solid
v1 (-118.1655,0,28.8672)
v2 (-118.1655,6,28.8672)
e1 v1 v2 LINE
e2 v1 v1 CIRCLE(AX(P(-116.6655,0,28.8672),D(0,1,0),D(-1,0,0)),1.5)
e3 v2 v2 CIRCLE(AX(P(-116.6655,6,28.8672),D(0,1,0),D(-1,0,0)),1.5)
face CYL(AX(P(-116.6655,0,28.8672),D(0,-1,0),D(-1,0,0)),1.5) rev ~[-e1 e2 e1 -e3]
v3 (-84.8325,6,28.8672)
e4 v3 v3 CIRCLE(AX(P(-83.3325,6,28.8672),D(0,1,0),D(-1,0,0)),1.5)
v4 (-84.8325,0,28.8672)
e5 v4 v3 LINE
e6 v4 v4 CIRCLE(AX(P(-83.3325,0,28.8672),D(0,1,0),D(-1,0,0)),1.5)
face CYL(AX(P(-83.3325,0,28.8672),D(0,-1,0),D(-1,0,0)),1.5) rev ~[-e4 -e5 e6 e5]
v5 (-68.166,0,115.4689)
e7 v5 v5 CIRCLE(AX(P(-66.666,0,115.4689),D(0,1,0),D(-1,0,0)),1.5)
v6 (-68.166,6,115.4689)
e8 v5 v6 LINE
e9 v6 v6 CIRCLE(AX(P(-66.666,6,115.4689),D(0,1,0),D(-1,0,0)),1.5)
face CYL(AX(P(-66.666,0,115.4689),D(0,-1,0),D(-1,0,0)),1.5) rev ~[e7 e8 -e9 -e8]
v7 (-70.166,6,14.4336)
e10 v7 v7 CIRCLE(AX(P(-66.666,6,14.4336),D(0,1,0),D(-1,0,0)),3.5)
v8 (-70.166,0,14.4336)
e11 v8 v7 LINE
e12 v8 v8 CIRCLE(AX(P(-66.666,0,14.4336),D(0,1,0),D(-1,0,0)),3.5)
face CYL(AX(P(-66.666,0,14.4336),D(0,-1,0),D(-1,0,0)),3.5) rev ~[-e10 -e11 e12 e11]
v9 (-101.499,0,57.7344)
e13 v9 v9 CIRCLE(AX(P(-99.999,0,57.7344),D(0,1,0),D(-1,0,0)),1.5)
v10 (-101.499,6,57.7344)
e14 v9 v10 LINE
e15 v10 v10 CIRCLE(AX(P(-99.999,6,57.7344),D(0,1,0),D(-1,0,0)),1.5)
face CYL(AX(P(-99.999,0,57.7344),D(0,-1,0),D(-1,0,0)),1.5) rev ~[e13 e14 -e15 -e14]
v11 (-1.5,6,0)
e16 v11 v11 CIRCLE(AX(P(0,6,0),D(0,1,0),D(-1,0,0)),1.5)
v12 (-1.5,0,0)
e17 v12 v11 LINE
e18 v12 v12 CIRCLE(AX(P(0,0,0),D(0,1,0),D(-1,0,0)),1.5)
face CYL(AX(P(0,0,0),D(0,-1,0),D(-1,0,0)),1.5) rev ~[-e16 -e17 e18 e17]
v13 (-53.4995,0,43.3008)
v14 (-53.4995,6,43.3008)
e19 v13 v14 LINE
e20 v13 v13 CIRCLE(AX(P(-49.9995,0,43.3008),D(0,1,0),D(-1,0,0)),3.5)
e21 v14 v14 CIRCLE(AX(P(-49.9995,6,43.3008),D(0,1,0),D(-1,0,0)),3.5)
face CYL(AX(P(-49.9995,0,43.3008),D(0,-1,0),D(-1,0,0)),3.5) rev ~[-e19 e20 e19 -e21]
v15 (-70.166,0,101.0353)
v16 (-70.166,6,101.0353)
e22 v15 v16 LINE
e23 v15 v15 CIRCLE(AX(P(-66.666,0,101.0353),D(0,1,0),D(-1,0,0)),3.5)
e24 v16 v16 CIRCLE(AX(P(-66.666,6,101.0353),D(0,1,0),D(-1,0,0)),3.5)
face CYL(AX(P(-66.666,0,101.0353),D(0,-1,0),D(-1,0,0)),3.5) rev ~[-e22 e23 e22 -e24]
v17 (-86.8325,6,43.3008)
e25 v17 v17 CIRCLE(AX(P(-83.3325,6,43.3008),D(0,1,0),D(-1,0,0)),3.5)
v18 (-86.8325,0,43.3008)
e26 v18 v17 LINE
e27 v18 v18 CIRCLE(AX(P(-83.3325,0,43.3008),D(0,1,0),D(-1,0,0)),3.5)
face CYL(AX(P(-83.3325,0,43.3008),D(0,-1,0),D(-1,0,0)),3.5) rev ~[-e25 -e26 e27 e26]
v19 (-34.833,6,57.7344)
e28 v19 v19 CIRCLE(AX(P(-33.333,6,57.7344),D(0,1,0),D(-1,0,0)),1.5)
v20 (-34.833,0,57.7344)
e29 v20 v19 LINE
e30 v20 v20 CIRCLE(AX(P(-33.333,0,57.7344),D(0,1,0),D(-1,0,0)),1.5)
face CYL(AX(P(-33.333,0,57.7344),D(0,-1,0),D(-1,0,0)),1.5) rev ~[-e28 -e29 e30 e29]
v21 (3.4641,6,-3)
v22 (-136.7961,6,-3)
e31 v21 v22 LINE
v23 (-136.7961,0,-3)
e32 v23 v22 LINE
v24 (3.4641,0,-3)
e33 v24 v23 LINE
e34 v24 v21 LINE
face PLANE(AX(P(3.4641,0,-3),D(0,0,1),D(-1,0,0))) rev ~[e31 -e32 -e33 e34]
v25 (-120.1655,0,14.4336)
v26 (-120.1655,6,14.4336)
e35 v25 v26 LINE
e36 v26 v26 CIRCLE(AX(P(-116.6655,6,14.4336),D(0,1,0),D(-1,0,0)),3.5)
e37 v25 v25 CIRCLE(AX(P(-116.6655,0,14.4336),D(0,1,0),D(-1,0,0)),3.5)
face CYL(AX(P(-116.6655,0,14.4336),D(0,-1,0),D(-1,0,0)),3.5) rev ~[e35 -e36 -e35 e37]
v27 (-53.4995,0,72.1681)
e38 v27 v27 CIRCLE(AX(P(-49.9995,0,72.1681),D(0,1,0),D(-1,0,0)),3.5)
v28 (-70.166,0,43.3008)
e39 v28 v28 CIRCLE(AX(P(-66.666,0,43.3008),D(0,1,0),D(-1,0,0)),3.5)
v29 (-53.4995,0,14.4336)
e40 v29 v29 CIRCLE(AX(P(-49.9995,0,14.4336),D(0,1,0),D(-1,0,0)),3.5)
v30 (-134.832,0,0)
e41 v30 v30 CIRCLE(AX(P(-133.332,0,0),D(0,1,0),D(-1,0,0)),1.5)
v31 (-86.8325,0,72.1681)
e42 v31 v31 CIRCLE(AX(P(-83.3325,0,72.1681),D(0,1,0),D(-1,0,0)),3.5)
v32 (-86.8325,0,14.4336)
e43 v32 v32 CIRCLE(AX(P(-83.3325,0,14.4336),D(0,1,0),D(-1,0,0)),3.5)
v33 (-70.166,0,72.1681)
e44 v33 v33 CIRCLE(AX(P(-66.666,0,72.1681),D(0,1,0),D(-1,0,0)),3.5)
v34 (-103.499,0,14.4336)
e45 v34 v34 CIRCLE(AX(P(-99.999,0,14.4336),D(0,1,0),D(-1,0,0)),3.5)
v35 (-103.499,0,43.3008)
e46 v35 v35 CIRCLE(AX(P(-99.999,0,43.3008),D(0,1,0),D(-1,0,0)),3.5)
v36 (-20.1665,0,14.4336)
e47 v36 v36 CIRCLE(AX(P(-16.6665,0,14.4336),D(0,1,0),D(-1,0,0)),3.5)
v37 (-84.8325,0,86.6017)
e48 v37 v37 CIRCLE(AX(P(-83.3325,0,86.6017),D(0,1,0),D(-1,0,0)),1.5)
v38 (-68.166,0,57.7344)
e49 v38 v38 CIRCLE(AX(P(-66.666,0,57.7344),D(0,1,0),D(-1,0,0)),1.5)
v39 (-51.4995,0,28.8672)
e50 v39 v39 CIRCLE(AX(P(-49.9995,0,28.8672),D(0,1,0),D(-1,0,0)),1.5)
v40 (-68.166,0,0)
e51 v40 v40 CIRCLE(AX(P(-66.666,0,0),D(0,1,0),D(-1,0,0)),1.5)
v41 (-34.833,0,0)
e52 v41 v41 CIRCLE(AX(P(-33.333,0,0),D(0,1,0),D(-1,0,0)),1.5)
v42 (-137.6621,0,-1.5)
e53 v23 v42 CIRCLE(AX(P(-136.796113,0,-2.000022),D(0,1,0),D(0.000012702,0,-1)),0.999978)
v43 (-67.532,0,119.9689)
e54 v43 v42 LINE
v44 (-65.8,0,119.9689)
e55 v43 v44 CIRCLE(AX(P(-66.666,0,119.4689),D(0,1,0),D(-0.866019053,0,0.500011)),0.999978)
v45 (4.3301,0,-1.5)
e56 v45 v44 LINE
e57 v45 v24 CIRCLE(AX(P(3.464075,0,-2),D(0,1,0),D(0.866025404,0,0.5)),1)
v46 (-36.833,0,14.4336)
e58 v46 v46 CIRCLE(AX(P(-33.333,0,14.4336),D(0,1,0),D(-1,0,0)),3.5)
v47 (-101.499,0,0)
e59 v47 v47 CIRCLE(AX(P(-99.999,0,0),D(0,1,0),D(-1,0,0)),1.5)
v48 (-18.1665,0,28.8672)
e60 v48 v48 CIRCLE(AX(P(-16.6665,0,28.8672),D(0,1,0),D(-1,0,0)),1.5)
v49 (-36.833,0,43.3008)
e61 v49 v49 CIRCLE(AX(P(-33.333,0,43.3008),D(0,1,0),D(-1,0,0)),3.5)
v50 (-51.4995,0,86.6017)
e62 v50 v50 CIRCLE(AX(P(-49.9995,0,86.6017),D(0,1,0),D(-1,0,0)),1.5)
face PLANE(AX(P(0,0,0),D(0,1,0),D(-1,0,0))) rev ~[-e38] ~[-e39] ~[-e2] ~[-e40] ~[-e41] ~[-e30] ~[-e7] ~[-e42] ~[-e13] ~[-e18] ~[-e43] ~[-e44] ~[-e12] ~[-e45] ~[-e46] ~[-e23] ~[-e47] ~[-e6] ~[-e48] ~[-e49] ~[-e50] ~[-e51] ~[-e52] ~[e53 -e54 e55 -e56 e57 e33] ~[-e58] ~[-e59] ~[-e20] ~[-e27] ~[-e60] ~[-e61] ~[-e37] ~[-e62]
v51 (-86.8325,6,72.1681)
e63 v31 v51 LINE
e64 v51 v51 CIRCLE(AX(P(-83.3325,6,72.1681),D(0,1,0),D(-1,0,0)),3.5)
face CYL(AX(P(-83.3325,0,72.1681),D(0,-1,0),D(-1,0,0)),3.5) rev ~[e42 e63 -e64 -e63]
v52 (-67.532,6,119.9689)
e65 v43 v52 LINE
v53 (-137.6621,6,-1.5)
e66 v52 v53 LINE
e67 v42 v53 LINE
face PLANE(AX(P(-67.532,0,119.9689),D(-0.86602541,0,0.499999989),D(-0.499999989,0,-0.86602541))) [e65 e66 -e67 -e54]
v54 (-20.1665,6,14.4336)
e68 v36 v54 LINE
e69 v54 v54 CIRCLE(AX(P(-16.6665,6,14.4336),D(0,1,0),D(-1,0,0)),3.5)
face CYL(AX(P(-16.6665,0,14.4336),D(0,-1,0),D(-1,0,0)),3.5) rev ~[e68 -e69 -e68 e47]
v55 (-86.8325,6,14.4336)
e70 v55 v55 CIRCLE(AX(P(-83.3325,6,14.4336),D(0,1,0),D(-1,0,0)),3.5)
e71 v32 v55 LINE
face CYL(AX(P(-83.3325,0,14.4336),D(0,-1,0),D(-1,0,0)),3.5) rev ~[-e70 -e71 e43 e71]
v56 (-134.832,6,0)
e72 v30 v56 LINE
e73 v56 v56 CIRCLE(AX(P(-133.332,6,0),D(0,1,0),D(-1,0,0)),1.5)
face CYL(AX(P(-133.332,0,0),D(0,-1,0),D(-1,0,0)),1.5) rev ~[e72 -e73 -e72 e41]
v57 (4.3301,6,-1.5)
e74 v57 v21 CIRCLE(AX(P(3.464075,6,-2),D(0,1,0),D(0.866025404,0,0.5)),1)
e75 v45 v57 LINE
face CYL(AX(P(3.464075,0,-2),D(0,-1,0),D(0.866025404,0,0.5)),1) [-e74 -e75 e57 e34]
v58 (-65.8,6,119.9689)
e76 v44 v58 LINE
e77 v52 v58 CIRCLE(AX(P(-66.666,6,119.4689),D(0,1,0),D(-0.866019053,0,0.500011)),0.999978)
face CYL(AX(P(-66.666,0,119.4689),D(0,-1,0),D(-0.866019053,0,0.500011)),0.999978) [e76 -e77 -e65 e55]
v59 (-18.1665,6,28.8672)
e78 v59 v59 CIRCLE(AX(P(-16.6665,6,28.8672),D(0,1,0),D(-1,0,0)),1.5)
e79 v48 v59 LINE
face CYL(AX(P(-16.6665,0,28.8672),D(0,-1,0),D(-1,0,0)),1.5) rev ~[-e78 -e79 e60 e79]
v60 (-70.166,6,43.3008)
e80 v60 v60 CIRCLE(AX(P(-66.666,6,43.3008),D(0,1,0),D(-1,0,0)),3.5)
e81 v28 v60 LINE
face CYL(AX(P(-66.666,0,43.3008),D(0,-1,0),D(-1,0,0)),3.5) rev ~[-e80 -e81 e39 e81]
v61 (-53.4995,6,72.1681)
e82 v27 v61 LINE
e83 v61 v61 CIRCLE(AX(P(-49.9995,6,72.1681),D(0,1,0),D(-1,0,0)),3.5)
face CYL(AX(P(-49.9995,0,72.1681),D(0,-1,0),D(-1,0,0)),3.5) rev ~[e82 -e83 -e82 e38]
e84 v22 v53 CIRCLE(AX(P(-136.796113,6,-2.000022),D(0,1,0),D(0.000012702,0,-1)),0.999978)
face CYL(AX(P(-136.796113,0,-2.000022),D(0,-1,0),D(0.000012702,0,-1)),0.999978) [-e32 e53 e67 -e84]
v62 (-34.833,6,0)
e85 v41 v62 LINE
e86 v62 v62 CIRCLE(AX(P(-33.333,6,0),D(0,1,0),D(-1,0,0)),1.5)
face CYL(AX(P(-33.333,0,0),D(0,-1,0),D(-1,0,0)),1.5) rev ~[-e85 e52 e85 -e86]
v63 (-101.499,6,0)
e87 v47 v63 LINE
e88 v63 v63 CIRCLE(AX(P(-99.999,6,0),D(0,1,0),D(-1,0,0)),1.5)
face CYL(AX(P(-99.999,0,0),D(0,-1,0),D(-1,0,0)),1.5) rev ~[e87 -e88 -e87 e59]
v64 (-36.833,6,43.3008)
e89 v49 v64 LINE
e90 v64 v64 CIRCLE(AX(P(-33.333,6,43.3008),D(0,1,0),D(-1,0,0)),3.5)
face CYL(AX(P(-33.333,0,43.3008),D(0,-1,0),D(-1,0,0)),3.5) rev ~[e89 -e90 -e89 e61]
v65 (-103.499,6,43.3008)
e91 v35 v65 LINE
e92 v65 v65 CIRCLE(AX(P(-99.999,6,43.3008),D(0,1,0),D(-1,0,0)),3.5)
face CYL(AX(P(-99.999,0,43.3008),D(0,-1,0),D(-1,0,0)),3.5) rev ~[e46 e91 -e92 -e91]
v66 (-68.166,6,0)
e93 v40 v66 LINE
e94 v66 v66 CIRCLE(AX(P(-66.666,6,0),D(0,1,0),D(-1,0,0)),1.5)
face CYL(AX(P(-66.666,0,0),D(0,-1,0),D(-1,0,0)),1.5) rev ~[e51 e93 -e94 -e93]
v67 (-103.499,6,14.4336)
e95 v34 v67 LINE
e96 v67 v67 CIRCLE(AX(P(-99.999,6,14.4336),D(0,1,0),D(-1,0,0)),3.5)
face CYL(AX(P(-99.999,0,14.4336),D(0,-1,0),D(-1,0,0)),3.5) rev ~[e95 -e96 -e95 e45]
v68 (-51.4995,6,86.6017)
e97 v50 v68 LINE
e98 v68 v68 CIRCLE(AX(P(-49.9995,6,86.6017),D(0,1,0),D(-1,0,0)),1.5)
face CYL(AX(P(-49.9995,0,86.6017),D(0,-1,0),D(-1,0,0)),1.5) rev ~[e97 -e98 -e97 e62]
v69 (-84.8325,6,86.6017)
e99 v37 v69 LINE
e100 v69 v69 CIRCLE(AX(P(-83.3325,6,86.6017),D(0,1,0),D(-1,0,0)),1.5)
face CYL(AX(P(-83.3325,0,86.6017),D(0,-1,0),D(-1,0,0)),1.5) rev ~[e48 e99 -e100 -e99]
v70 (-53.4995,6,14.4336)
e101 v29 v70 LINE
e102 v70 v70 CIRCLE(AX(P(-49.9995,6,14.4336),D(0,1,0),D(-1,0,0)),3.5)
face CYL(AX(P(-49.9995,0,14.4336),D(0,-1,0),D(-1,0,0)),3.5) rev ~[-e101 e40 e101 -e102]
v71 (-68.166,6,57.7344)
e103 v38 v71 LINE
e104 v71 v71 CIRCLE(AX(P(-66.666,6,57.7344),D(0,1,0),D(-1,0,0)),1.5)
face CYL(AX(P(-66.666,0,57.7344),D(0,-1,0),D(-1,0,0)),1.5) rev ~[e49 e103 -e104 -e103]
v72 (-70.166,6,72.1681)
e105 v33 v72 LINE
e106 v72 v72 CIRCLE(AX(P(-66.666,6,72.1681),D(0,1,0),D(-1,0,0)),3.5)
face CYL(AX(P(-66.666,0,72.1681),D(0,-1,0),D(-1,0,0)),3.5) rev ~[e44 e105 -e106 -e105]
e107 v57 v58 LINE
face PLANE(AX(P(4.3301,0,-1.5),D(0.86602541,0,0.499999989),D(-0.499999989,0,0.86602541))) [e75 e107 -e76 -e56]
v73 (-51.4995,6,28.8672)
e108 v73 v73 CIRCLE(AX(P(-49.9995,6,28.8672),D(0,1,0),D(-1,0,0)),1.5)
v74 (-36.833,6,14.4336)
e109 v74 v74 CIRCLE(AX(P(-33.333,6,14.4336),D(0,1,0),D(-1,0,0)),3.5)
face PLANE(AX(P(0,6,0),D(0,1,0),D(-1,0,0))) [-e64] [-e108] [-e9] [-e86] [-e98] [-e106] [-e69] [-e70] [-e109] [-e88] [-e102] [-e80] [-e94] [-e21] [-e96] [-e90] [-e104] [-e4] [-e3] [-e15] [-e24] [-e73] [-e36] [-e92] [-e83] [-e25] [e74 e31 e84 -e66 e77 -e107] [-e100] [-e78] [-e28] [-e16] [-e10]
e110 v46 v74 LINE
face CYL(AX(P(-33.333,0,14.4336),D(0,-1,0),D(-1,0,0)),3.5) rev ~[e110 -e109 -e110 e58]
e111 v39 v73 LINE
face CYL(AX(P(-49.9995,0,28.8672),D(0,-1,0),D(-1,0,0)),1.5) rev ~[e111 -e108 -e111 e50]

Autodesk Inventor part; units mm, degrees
ref_plane "YZ Plane" through (0, 0, 0) normal (1, 0, 0) x (0, 1, 0)
ref_plane "XZ Plane" through (0, 0, 0) normal (0, 1, 0) x (-1, 0, 0)
ref_plane "XY Plane" through (0, 0, 0) normal (0, 0, 1) x (1, 0, 0)
sketch "Triangle 1mm" plane through (0, 0, 0) normal (0, 0, 1) x (1, 0, 0)
  line L0 (0, 0) -> (16.6665, 28.8672) construction
  line L1 (16.6665, 28.8672) -> (33.333, 0) construction
  line L2 (33.333, 0) -> (0, 0) construction
  line L3 (33.333, 0) -> (8.3332, 14.4336) construction
  line L4 (0, 0) -> (24.9997, 14.4336) construction
  line L5 (16.6665, 28.8672) -> (16.6665, 0) construction
  line L6 (0, 14.4336) -> (33.333, 14.4336) construction
  line L7 (0, 19.4336) -> (33.333, 19.4336) construction
  line L8 (0, 9.4336) -> (33.333, 9.4336) construction
  line L9 (16.6665, 19.4336) -> (16.6665, 14.4336) construction
  line L10 (16.6665, 14.4336) -> (16.6665, 9.4336) construction
  circle A0 centre (16.6665, 14.4336) radius 3.5
  point P0 (16.9666, 9.7956)
  dimension "d14" = 33.333
  dimension "d31" = 10
  dimension "d43" = 7
sketch "Tri16 1mm" plane through (0, 0, 0) normal (0, 0, 1) x (1, 0, 0)
  line L0 (0, 0) -> (16.6665, 28.8672) construction
  line L1 (16.6665, 28.8672) -> (33.333, 0) construction
  line L2 (33.333, 0) -> (0, 0) construction
  line L3 (33.333, 0) -> (8.3333, 14.4336) construction
  line L4 (0, 0) -> (24.9998, 14.4336) construction
  line L5 (16.6665, 28.8672) -> (16.6665, 0) construction
  line L6 (0, 14.4336) -> (33.333, 14.4336) construction
  line L7 (0, 19.4336) -> (33.333, 19.4336) construction
  line L8 (0, 9.4336) -> (33.333, 9.4336) construction
  line L9 (16.6665, 19.4336) -> (16.6665, 14.4336) construction
  line L10 (16.6665, 14.4336) -> (16.6665, 9.4336) construction
  circle A0 centre (16.6665, 14.4336) radius 3.5
  line L11 (33.333, 0) -> (49.9995, 28.8672) construction
  line L12 (49.9995, 28.8672) -> (66.666, 0) construction
  line L13 (66.666, 0) -> (33.333, 0) construction
  line L14 (66.666, 0) -> (41.6663, 14.4336) construction
  line L15 (33.333, 0) -> (58.3328, 14.4336) construction
  line L16 (49.9995, 28.8672) -> (49.9995, 0) construction
  line L17 (33.333, 14.4336) -> (66.666, 14.4336) construction
  line L18 (33.333, 19.4336) -> (66.666, 19.4336) construction
  line L19 (33.333, 9.4336) -> (66.666, 9.4336) construction
  line L20 (49.9995, 19.4336) -> (49.9995, 14.4336) construction
  line L21 (49.9995, 14.4336) -> (49.9995, 9.4336) construction
  circle A1 centre (49.9995, 14.4336) radius 3.5
  line L22 (49.9995, 28.8672) -> (33.333, 0) construction
  line L23 (33.333, 0) -> (16.6665, 28.8672) construction
  line L24 (16.6665, 28.8672) -> (49.9995, 28.8672) construction
  line L25 (16.6665, 28.8672) -> (41.6663, 14.4336) construction
  line L26 (49.9995, 28.8672) -> (24.9998, 14.4336) construction
  line L27 (33.333, 0) -> (33.333, 28.8672) construction
  line L28 (49.9995, 14.4336) -> (16.6665, 14.4336) construction
  line L29 (49.9995, 9.4336) -> (16.6665, 9.4336) construction
  line L30 (49.9995, 19.4336) -> (16.6665, 19.4336) construction
  line L31 (33.333, 9.4336) -> (33.333, 14.4336) construction
  line L32 (33.333, 14.4336) -> (33.333, 19.4336) construction
  circle A2 centre (33.333, 14.4336) radius 3.5
  line L33 (83.3325, 28.8672) -> (66.666, 0) construction
  line L34 (66.666, 0) -> (49.9995, 28.8672) construction
  line L35 (49.9995, 28.8672) -> (83.3325, 28.8672) construction
  line L36 (49.9995, 28.8672) -> (74.9993, 14.4336) construction
  line L37 (83.3325, 28.8672) -> (58.3328, 14.4336) construction
  line L38 (66.666, 0) -> (66.666, 28.8672) construction
  line L39 (83.3325, 14.4336) -> (49.9995, 14.4336) construction
  line L40 (83.3325, 9.4336) -> (49.9995, 9.4336) construction
  line L41 (83.3325, 19.4336) -> (49.9995, 19.4336) construction
  line L42 (66.666, 9.4336) -> (66.666, 14.4336) construction
  line L43 (66.666, 14.4336) -> (66.666, 19.4336) construction
  circle A3 centre (66.666, 14.4336) radius 3.5
  line L44 (66.666, 0) -> (83.3325, 28.8672) construction
  line L45 (83.3325, 28.8672) -> (99.999, 0) construction
  line L46 (99.999, 0) -> (66.666, 0) construction
  line L47 (99.999, 0) -> (74.9993, 14.4336) construction
  line L48 (66.666, 0) -> (91.6658, 14.4336) construction
  line L49 (83.3325, 28.8672) -> (83.3325, 0) construction
  line L50 (66.666, 14.4336) -> (99.999, 14.4336) construction
  line L51 (66.666, 19.4336) -> (99.999, 19.4336) construction
  line L52 (66.666, 9.4336) -> (99.999, 9.4336) construction
  line L53 (83.3325, 19.4336) -> (83.3325, 14.4336) construction
  line L54 (83.3325, 14.4336) -> (83.3325, 9.4336) construction
  circle A4 centre (83.3325, 14.4336) radius 3.5
  line L55 (99.999, 0) -> (116.6655, 28.8672) construction
  line L56 (116.6655, 28.8672) -> (133.332, 0) construction
  line L57 (133.332, 0) -> (99.999, 0) construction
  line L58 (133.332, 0) -> (108.3323, 14.4336) construction
  line L59 (99.999, 0) -> (124.9988, 14.4336) construction
  line L60 (116.6655, 28.8672) -> (116.6655, 0) construction
  line L61 (99.999, 14.4336) -> (133.332, 14.4336) construction
  line L62 (99.999, 19.4336) -> (133.332, 19.4336) construction
  line L63 (99.999, 9.4336) -> (133.332, 9.4336) construction
  line L64 (116.6655, 19.4336) -> (116.6655, 14.4336) construction
  line L65 (116.6655, 14.4336) -> (116.6655, 9.4336) construction
  circle A5 centre (116.6655, 14.4336) radius 3.5
  line L66 (116.6655, 28.8672) -> (99.999, 0) construction
  line L67 (99.999, 0) -> (83.3325, 28.8672) construction
  line L68 (83.3325, 28.8672) -> (116.6655, 28.8672) construction
  line L69 (83.3325, 28.8672) -> (108.3323, 14.4336) construction
  line L70 (116.6655, 28.8672) -> (91.6658, 14.4336) construction
  line L71 (99.999, 0) -> (99.999, 28.8672) construction
  line L72 (116.6655, 14.4336) -> (83.3325, 14.4336) construction
  line L73 (116.6655, 9.4336) -> (83.3325, 9.4336) construction
  line L74 (116.6655, 19.4336) -> (83.3325, 19.4336) construction
  line L75 (99.999, 9.4336) -> (99.999, 14.4336) construction
  line L76 (99.999, 14.4336) -> (99.999, 19.4336) construction
  circle A6 centre (99.999, 14.4336) radius 3.5
  line L77 (16.6665, 28.8672) -> (33.333, 57.7344) construction
  line L78 (33.333, 57.7344) -> (49.9995, 28.8672) construction
  line L79 (49.9995, 28.8672) -> (16.6665, 28.8672) construction
  line L80 (49.9995, 28.8672) -> (24.9998, 43.3008) construction
  line L81 (16.6665, 28.8672) -> (41.6663, 43.3008) construction
  line L82 (33.333, 57.7344) -> (33.333, 28.8672) construction
  line L83 (16.6665, 43.3008) -> (49.9995, 43.3008) construction
  line L84 (16.6665, 48.3008) -> (49.9995, 48.3008) construction
  line L85 (16.6665, 38.3008) -> (49.9995, 38.3008) construction
  line L86 (33.333, 48.3008) -> (33.333, 43.3008) construction
  line L87 (33.333, 43.3008) -> (33.333, 38.3008) construction
  circle A7 centre (33.333, 43.3008) radius 3.5
  line L88 (33.333, 57.7344) -> (49.9995, 86.6017) construction
  line L89 (49.9995, 86.6017) -> (66.666, 57.7344) construction
  line L90 (66.666, 57.7344) -> (33.333, 57.7344) construction
  line L91 (66.666, 57.7344) -> (41.6663, 72.1681) construction
  line L92 (33.333, 57.7344) -> (58.3328, 72.1681) construction
  line L93 (49.9995, 86.6017) -> (49.9995, 57.7344) construction
  line L94 (33.333, 72.1681) -> (66.666, 72.1681) construction
  line L95 (33.333, 77.1681) -> (66.666, 77.1681) construction
  line L96 (33.333, 67.1681) -> (66.666, 67.1681) construction
  line L97 (49.9995, 77.1681) -> (49.9995, 72.1681) construction
  line L98 (49.9995, 72.1681) -> (49.9995, 67.1681) construction
  circle A8 centre (49.9995, 72.1681) radius 3.5
  line L99 (49.9995, 86.6017) -> (66.666, 115.4689) construction
  line L100 (66.666, 115.4689) -> (83.3325, 86.6017) construction
  line L101 (83.3325, 86.6017) -> (49.9995, 86.6017) construction
  line L102 (83.3325, 86.6017) -> (58.3328, 101.0353) construction
  line L103 (49.9995, 86.6017) -> (74.9993, 101.0353) construction
  line L104 (66.666, 115.4689) -> (66.666, 86.6017) construction
  line L105 (49.9995, 101.0353) -> (83.3325, 101.0353) construction
  line L106 (49.9995, 106.0353) -> (83.3325, 106.0353) construction
  line L107 (49.9995, 96.0353) -> (83.3325, 96.0353) construction
  line L108 (66.666, 106.0353) -> (66.666, 101.0353) construction
  line L109 (66.666, 101.0353) -> (66.666, 96.0353) construction
  circle A9 centre (66.666, 101.0353) radius 3.5
  line L110 (66.666, 57.7344) -> (49.9995, 28.8672) construction
  line L111 (49.9995, 28.8672) -> (33.333, 57.7344) construction
  line L112 (33.333, 57.7344) -> (66.666, 57.7344) construction
  line L113 (33.333, 57.7344) -> (58.3328, 43.3008) construction
  line L114 (66.666, 57.7344) -> (41.6663, 43.3008) construction
  line L115 (49.9995, 28.8672) -> (49.9995, 57.7344) construction
  line L116 (66.666, 43.3008) -> (33.333, 43.3008) construction
  line L117 (66.666, 38.3008) -> (33.333, 38.3008) construction
  line L118 (66.666, 48.3008) -> (33.333, 48.3008) construction
  line L119 (49.9995, 38.3008) -> (49.9995, 43.3008) construction
  line L120 (49.9995, 43.3008) -> (49.9995, 48.3008) construction
  circle A10 centre (49.9995, 43.3008) radius 3.5
  line L121 (83.3325, 86.6017) -> (66.666, 57.7344) construction
  line L122 (66.666, 57.7344) -> (49.9995, 86.6017) construction
  line L123 (49.9995, 86.6017) -> (83.3325, 86.6017) construction
  line L124 (49.9995, 86.6017) -> (74.9993, 72.1681) construction
  line L125 (83.3325, 86.6017) -> (58.3328, 72.1681) construction
  line L126 (66.666, 57.7344) -> (66.666, 86.6017) construction
  line L127 (83.3325, 72.1681) -> (49.9995, 72.1681) construction
  line L128 (83.3325, 67.1681) -> (49.9995, 67.1681) construction
  line L129 (83.3325, 77.1681) -> (49.9995, 77.1681) construction
  line L130 (66.666, 67.1681) -> (66.666, 72.1681) construction
  line L131 (66.666, 72.1681) -> (66.666, 77.1681) construction
  circle A11 centre (66.666, 72.1681) radius 3.5
  line L132 (66.666, 57.7344) -> (83.3325, 86.6017) construction
  line L133 (83.3325, 86.6017) -> (99.999, 57.7344) construction
  line L134 (99.999, 57.7344) -> (66.666, 57.7344) construction
  line L135 (99.999, 57.7344) -> (74.9993, 72.1681) construction
  line L136 (66.666, 57.7344) -> (91.6658, 72.1681) construction
  line L137 (83.3325, 86.6017) -> (83.3325, 57.7344) construction
  line L138 (66.666, 72.1681) -> (99.999, 72.1681) construction
  line L139 (66.666, 77.1681) -> (99.999, 77.1681) construction
  line L140 (66.666, 67.1681) -> (99.999, 67.1681) construction
  line L141 (83.3325, 77.1681) -> (83.3325, 72.1681) construction
  line L142 (83.3325, 72.1681) -> (83.3325, 67.1681) construction
  circle A12 centre (83.3325, 72.1681) radius 3.5
  line L143 (49.9995, 28.8672) -> (66.666, 57.7344) construction
  line L144 (66.666, 57.7344) -> (83.3325, 28.8672) construction
  line L145 (83.3325, 28.8672) -> (49.9995, 28.8672) construction
  line L146 (83.3325, 28.8672) -> (58.3328, 43.3008) construction
  line L147 (49.9995, 28.8672) -> (74.9993, 43.3008) construction
  line L148 (66.666, 57.7344) -> (66.666, 28.8672) construction
  line L149 (49.9995, 43.3008) -> (83.3325, 43.3008) construction
  line L150 (49.9995, 48.3008) -> (83.3325, 48.3008) construction
  line L151 (49.9995, 38.3008) -> (83.3325, 38.3008) construction
  line L152 (66.666, 48.3008) -> (66.666, 43.3008) construction
  line L153 (66.666, 43.3008) -> (66.666, 38.3008) construction
  circle A13 centre (66.666, 43.3008) radius 3.5
  line L154 (83.3325, 28.8672) -> (99.999, 57.7344) construction
  line L155 (99.999, 57.7344) -> (116.6655, 28.8672) construction
  line L156 (116.6655, 28.8672) -> (83.3325, 28.8672) construction
  line L157 (116.6655, 28.8672) -> (91.6658, 43.3008) construction
  line L158 (83.3325, 28.8672) -> (108.3323, 43.3008) construction
  line L159 (99.999, 57.7344) -> (99.999, 28.8672) construction
  line L160 (83.3325, 43.3008) -> (116.6655, 43.3008) construction
  line L161 (83.3325, 48.3008) -> (116.6655, 48.3008) construction
  line L162 (83.3325, 38.3008) -> (116.6655, 38.3008) construction
  line L163 (99.999, 48.3008) -> (99.999, 43.3008) construction
  line L164 (99.999, 43.3008) -> (99.999, 38.3008) construction
  circle A14 centre (99.999, 43.3008) radius 3.5
  line L165 (99.999, 57.7344) -> (83.3325, 28.8672) construction
  line L166 (83.3325, 28.8672) -> (66.666, 57.7344) construction
  line L167 (66.666, 57.7344) -> (99.999, 57.7344) construction
  line L168 (66.666, 57.7344) -> (91.6658, 43.3008) construction
  line L169 (99.999, 57.7344) -> (74.9993, 43.3008) construction
  line L170 (83.3325, 28.8672) -> (83.3325, 57.7344) construction
  line L171 (99.999, 43.3008) -> (66.666, 43.3008) construction
  line L172 (99.999, 38.3008) -> (66.666, 38.3008) construction
  line L173 (99.999, 48.3008) -> (66.666, 48.3008) construction
  line L174 (83.3325, 38.3008) -> (83.3325, 43.3008) construction
  line L175 (83.3325, 43.3008) -> (83.3325, 48.3008) construction
  circle A15 centre (83.3325, 43.3008) radius 3.5
  point P0 (66.741, 38.5329)
sketch "Top Plate" plane through (0, 0, 0) normal (0, 1, 0) x (-1, 0, 0)
  line L0 (-4.3301, -1.5) -> (65.8, 119.9689)
  line L1 (67.532, 119.9689) -> (137.6621, -1.5)
  line L2 (-3.4641, -3) -> (136.7961, -3)
  circle A0 centre (33.333, 0) radius 1.5
  circle A1 centre (0, 0) radius 1.5
  circle A2 centre (16.6665, 28.8672) radius 1.5
  circle A3 centre (33.333, 57.7344) radius 1.5
  circle A4 centre (49.9995, 28.8672) radius 1.5
  circle A5 centre (66.666, 0) radius 1.5
  circle A6 centre (99.999, 0) radius 1.5
  circle A7 centre (133.332, 0) radius 1.5
  circle A8 centre (116.6655, 28.8672) radius 1.5
  circle A9 centre (99.999, 57.7344) radius 1.5
  circle A10 centre (83.3325, 28.8672) radius 1.5
  circle A11 centre (66.666, 57.7344) radius 1.5
  circle A12 centre (83.3325, 86.6017) radius 1.5
  circle A13 centre (49.9995, 86.6017) radius 1.5
  circle A14 centre (66.666, 115.4689) radius 1.5
  arc A15 (67.532, 119.9689) -> (65.8, 119.9689) centre (66.666, 119.4689) ccw
  arc A16 (136.7961, -3) -> (137.6621, -1.5) centre (136.7961, -2) ccw
  arc A17 (-4.3301, -1.5) -> (-3.4641, -3) centre (-3.4641, -2) ccw
  line L3 (0, 0) -> (-14.4563, -8.3464) construction
  line L4 (133.332, 0) -> (144.2364, -6.2956) construction
  line L5 (27.8865, 48.3008) -> (27.8865, 48.3008)
  line L6 (108.6655, 28.8672) -> (113.6655, 28.8672) construction
  line L7 (98.999, 38.3008) -> (99.999, 38.3008)
  line L8 (0, 0) -> (16.6665, 28.8672) construction
  line L9 (16.6665, 28.8672) -> (33.333, 0) construction
  line L10 (33.333, 0) -> (0, 0) construction
  line L11 (33.333, 0) -> (8.3333, 14.4336) construction
  line L12 (0, 0) -> (24.9998, 14.4336) construction
  line L13 (16.6665, 28.8672) -> (16.6665, 0) construction
  line L14 (0, 14.4336) -> (33.333, 14.4336) construction
  line L15 (0, 19.4336) -> (33.333, 19.4336) construction
  line L16 (0, 9.4336) -> (33.333, 9.4336) construction
  line L17 (16.6665, 19.4336) -> (16.6665, 14.4336) construction
  line L18 (16.6665, 14.4336) -> (16.6665, 9.4336) construction
  circle A18 centre (16.6665, 14.4336) radius 3.5
  line L19 (33.333, 0) -> (49.9995, 28.8672) construction
  line L20 (49.9995, 28.8672) -> (66.666, 0) construction
  line L21 (66.666, 0) -> (33.333, 0) construction
  line L22 (66.666, 0) -> (41.6663, 14.4336) construction
  line L23 (33.333, 0) -> (58.3328, 14.4336) construction
  line L24 (49.9995, 28.8672) -> (49.9995, 0) construction
  line L25 (33.333, 14.4336) -> (66.666, 14.4336) construction
  line L26 (33.333, 19.4336) -> (66.666, 19.4336) construction
  line L27 (33.333, 9.4336) -> (66.666, 9.4336) construction
  line L28 (49.9995, 19.4336) -> (49.9995, 14.4336) construction
  line L29 (49.9995, 14.4336) -> (49.9995, 9.4336) construction
  circle A19 centre (49.9995, 14.4336) radius 3.5
  line L30 (49.9995, 28.8672) -> (33.333, 0) construction
  line L31 (33.333, 0) -> (16.6665, 28.8672) construction
  line L32 (16.6665, 28.8672) -> (49.9995, 28.8672) construction
  line L33 (16.6665, 28.8672) -> (41.6663, 14.4336) construction
  line L34 (49.9995, 28.8672) -> (24.9998, 14.4336) construction
  line L35 (33.333, 0) -> (33.333, 28.8672) construction
  line L36 (49.9995, 14.4336) -> (16.6665, 14.4336) construction
  line L37 (49.9995, 9.4336) -> (16.6665, 9.4336) construction
  line L38 (49.9995, 19.4336) -> (16.6665, 19.4336) construction
  line L39 (33.333, 9.4336) -> (33.333, 14.4336) construction
  line L40 (33.333, 14.4336) -> (33.333, 19.4336) construction
  circle A20 centre (33.333, 14.4336) radius 3.5
  line L41 (83.3325, 28.8672) -> (66.666, 0) construction
  line L42 (66.666, 0) -> (49.9995, 28.8672) construction
  line L43 (49.9995, 28.8672) -> (83.3325, 28.8672) construction
  line L44 (49.9995, 28.8672) -> (74.9993, 14.4336) construction
  line L45 (83.3325, 28.8672) -> (58.3328, 14.4336) construction
  line L46 (66.666, 0) -> (66.666, 28.8672) construction
  line L47 (83.3325, 14.4336) -> (49.9995, 14.4336) construction
  line L48 (83.3325, 9.4336) -> (49.9995, 9.4336) construction
  line L49 (83.3325, 19.4336) -> (49.9995, 19.4336) construction
  line L50 (66.666, 9.4336) -> (66.666, 14.4336) construction
  line L51 (66.666, 14.4336) -> (66.666, 19.4336) construction
  circle A21 centre (66.666, 14.4336) radius 3.5
  line L52 (66.666, 0) -> (83.3325, 28.8672) construction
  line L53 (83.3325, 28.8672) -> (99.999, 0) construction
  line L54 (99.999, 0) -> (66.666, 0) construction
  line L55 (99.999, 0) -> (74.9993, 14.4336) construction
  line L56 (66.666, 0) -> (91.6658, 14.4336) construction
  line L57 (83.3325, 28.8672) -> (83.3325, 0) construction
  line L58 (66.666, 14.4336) -> (99.999, 14.4336) construction
  line L59 (66.666, 19.4336) -> (99.999, 19.4336) construction
  line L60 (66.666, 9.4336) -> (99.999, 9.4336) construction
  line L61 (83.3325, 19.4336) -> (83.3325, 14.4336) construction
  line L62 (83.3325, 14.4336) -> (83.3325, 9.4336) construction
  circle A22 centre (83.3325, 14.4336) radius 3.5
  line L63 (99.999, 0) -> (116.6655, 28.8672) construction
  line L64 (116.6655, 28.8672) -> (133.332, 0) construction
  line L65 (133.332, 0) -> (99.999, 0) construction
  line L66 (133.332, 0) -> (108.3323, 14.4336) construction
  line L67 (99.999, 0) -> (124.9988, 14.4336) construction
  line L68 (116.6655, 28.8672) -> (116.6655, 0) construction
  line L69 (99.999, 14.4336) -> (133.332, 14.4336) construction
  line L70 (99.999, 19.4336) -> (133.332, 19.4336) construction
  line L71 (99.999, 9.4336) -> (133.332, 9.4336) construction
  line L72 (116.6655, 19.4336) -> (116.6655, 14.4336) construction
  line L73 (116.6655, 14.4336) -> (116.6655, 9.4336) construction
  circle A23 centre (116.6655, 14.4336) radius 3.5
  line L74 (116.6655, 28.8672) -> (99.999, 0) construction
  line L75 (99.999, 0) -> (83.3325, 28.8672) construction
  line L76 (83.3325, 28.8672) -> (116.6655, 28.8672) construction
  line L77 (83.3325, 28.8672) -> (108.3323, 14.4336) construction
  line L78 (116.6655, 28.8672) -> (91.6658, 14.4336) construction
  line L79 (99.999, 0) -> (99.999, 28.8672) construction
  line L80 (116.6655, 14.4336) -> (83.3325, 14.4336) construction
  line L81 (116.6655, 9.4336) -> (83.3325, 9.4336) construction
  line L82 (116.6655, 19.4336) -> (83.3325, 19.4336) construction
  line L83 (99.999, 9.4336) -> (99.999, 14.4336) construction
  line L84 (99.999, 14.4336) -> (99.999, 19.4336) construction
  circle A24 centre (99.999, 14.4336) radius 3.5
  line L85 (16.6665, 28.8672) -> (33.333, 57.7344) construction
  line L86 (33.333, 57.7344) -> (49.9995, 28.8672) construction
  line L87 (49.9995, 28.8672) -> (16.6665, 28.8672) construction
  line L88 (49.9995, 28.8672) -> (24.9998, 43.3008) construction
  line L89 (16.6665, 28.8672) -> (41.6663, 43.3008) construction
  line L90 (33.333, 57.7344) -> (33.333, 28.8672) construction
  line L91 (16.6665, 43.3008) -> (49.9995, 43.3008) construction
  line L92 (16.6665, 48.3008) -> (49.9995, 48.3008) construction
  line L93 (16.6665, 38.3008) -> (49.9995, 38.3008) construction
  line L94 (33.333, 48.3008) -> (33.333, 43.3008) construction
  line L95 (33.333, 43.3008) -> (33.333, 38.3008) construction
  circle A25 centre (33.333, 43.3008) radius 3.5
  line L96 (33.333, 57.7344) -> (49.9995, 86.6017) construction
  line L97 (49.9995, 86.6017) -> (66.666, 57.7344) construction
  line L98 (66.666, 57.7344) -> (33.333, 57.7344) construction
  line L99 (66.666, 57.7344) -> (41.6663, 72.1681) construction
  line L100 (33.333, 57.7344) -> (58.3328, 72.1681) construction
  line L101 (49.9995, 86.6017) -> (49.9995, 57.7344) construction
  line L102 (33.333, 72.1681) -> (66.666, 72.1681) construction
  line L103 (33.333, 77.1681) -> (66.666, 77.1681) construction
  line L104 (33.333, 67.1681) -> (66.666, 67.1681) construction
  line L105 (49.9995, 77.1681) -> (49.9995, 72.1681) construction
  line L106 (49.9995, 72.1681) -> (49.9995, 67.1681) construction
  circle A26 centre (49.9995, 72.1681) radius 3.5
  line L107 (49.9995, 86.6017) -> (66.666, 115.4689) construction
  line L108 (66.666, 115.4689) -> (83.3325, 86.6017) construction
  line L109 (83.3325, 86.6017) -> (49.9995, 86.6017) construction
  line L110 (83.3325, 86.6017) -> (58.3328, 101.0353) construction
  line L111 (49.9995, 86.6017) -> (74.9993, 101.0353) construction
  line L112 (66.666, 115.4689) -> (66.666, 86.6017) construction
  line L113 (49.9995, 101.0353) -> (83.3325, 101.0353) construction
  line L114 (49.9995, 106.0353) -> (83.3325, 106.0353) construction
  line L115 (49.9995, 96.0353) -> (83.3325, 96.0353) construction
  line L116 (66.666, 106.0353) -> (66.666, 101.0353) construction
  line L117 (66.666, 101.0353) -> (66.666, 96.0353) construction
  circle A27 centre (66.666, 101.0353) radius 3.5
  line L118 (66.666, 57.7344) -> (49.9995, 28.8672) construction
  line L119 (49.9995, 28.8672) -> (33.333, 57.7344) construction
  line L120 (33.333, 57.7344) -> (66.666, 57.7344) construction
  line L121 (33.333, 57.7344) -> (58.3328, 43.3008) construction
  line L122 (66.666, 57.7344) -> (41.6663, 43.3008) construction
  line L123 (49.9995, 28.8672) -> (49.9995, 57.7344) construction
  line L124 (66.666, 43.3008) -> (33.333, 43.3008) construction
  line L125 (66.666, 38.3008) -> (33.333, 38.3008) construction
  line L126 (66.666, 48.3008) -> (33.333, 48.3008) construction
  line L127 (49.9995, 38.3008) -> (49.9995, 43.3008) construction
  line L128 (49.9995, 43.3008) -> (49.9995, 48.3008) construction
  circle A28 centre (49.9995, 43.3008) radius 3.5
  line L129 (83.3325, 86.6017) -> (66.666, 57.7344) construction
  line L130 (66.666, 57.7344) -> (49.9995, 86.6017) construction
  line L131 (49.9995, 86.6017) -> (83.3325, 86.6017) construction
  line L132 (49.9995, 86.6017) -> (74.9993, 72.1681) construction
  line L133 (83.3325, 86.6017) -> (58.3328, 72.1681) construction
  line L134 (66.666, 57.7344) -> (66.666, 86.6017) construction
  line L135 (83.3325, 72.1681) -> (49.9995, 72.1681) construction
  line L136 (83.3325, 67.1681) -> (49.9995, 67.1681) construction
  line L137 (83.3325, 77.1681) -> (49.9995, 77.1681) construction
  line L138 (66.666, 67.1681) -> (66.666, 72.1681) construction
  line L139 (66.666, 72.1681) -> (66.666, 77.1681) construction
  circle A29 centre (66.666, 72.1681) radius 3.5
  line L140 (66.666, 57.7344) -> (83.3325, 86.6017) construction
  line L141 (83.3325, 86.6017) -> (99.999, 57.7344) construction
  line L142 (99.999, 57.7344) -> (66.666, 57.7344) construction
  line L143 (99.999, 57.7344) -> (74.9993, 72.1681) construction
  line L144 (66.666, 57.7344) -> (91.6658, 72.1681) construction
  line L145 (83.3325, 86.6017) -> (83.3325, 57.7344) construction
  line L146 (66.666, 72.1681) -> (99.999, 72.1681) construction
  line L147 (66.666, 77.1681) -> (99.999, 77.1681) construction
  line L148 (66.666, 67.1681) -> (99.999, 67.1681) construction
  line L149 (83.3325, 77.1681) -> (83.3325, 72.1681) construction
  line L150 (83.3325, 72.1681) -> (83.3325, 67.1681) construction
  circle A30 centre (83.3325, 72.1681) radius 3.5
  line L151 (49.9995, 28.8672) -> (66.666, 57.7344) construction
  line L152 (66.666, 57.7344) -> (83.3325, 28.8672) construction
  line L153 (83.3325, 28.8672) -> (49.9995, 28.8672) construction
  line L154 (83.3325, 28.8672) -> (58.3328, 43.3008) construction
  line L155 (49.9995, 28.8672) -> (74.9993, 43.3008) construction
  line L156 (66.666, 57.7344) -> (66.666, 28.8672) construction
  line L157 (49.9995, 43.3008) -> (83.3325, 43.3008) construction
  line L158 (49.9995, 48.3008) -> (83.3325, 48.3008) construction
  line L159 (49.9995, 38.3008) -> (83.3325, 38.3008) construction
  line L160 (66.666, 48.3008) -> (66.666, 43.3008) construction
  line L161 (66.666, 43.3008) -> (66.666, 38.3008) construction
  circle A31 centre (66.666, 43.3008) radius 3.5
  line L162 (83.3325, 28.8672) -> (99.999, 57.7344) construction
  line L163 (99.999, 57.7344) -> (116.6655, 28.8672) construction
  line L164 (116.6655, 28.8672) -> (83.3325, 28.8672) construction
  line L165 (116.6655, 28.8672) -> (91.6658, 43.3008) construction
  line L166 (83.3325, 28.8672) -> (108.3323, 43.3008) construction
  line L167 (99.999, 57.7344) -> (99.999, 28.8672) construction
  line L168 (83.3325, 43.3008) -> (116.6655, 43.3008) construction
  line L169 (83.3325, 48.3008) -> (116.6655, 48.3008) construction
  line L170 (83.3325, 38.3008) -> (116.6655, 38.3008) construction
  line L171 (99.999, 48.3008) -> (99.999, 43.3008) construction
  line L172 (99.999, 43.3008) -> (99.999, 38.3008) construction
  circle A32 centre (99.999, 43.3008) radius 3.5
  line L173 (99.999, 57.7344) -> (83.3325, 28.8672) construction
  line L174 (83.3325, 28.8672) -> (66.666, 57.7344) construction
  line L175 (66.666, 57.7344) -> (99.999, 57.7344) construction
  line L176 (66.666, 57.7344) -> (91.6658, 43.3008) construction
  line L177 (99.999, 57.7344) -> (74.9993, 43.3008) construction
  line L178 (83.3325, 28.8672) -> (83.3325, 57.7344) construction
  line L179 (99.999, 43.3008) -> (66.666, 43.3008) construction
  line L180 (99.999, 38.3008) -> (66.666, 38.3008) construction
  line L181 (99.999, 48.3008) -> (66.666, 48.3008) construction
  line L182 (83.3325, 38.3008) -> (83.3325, 43.3008) construction
  line L183 (83.3325, 43.3008) -> (83.3325, 48.3008) construction
  circle A33 centre (83.3325, 43.3008) radius 3.5
  dimension "d25" = 3
  dimension "d35" = 3
  dimension "d36" = 1
extrude "Extrusion3" add sketch "Top Plate" along normal blind 6
properties part number "grid16-mask"
